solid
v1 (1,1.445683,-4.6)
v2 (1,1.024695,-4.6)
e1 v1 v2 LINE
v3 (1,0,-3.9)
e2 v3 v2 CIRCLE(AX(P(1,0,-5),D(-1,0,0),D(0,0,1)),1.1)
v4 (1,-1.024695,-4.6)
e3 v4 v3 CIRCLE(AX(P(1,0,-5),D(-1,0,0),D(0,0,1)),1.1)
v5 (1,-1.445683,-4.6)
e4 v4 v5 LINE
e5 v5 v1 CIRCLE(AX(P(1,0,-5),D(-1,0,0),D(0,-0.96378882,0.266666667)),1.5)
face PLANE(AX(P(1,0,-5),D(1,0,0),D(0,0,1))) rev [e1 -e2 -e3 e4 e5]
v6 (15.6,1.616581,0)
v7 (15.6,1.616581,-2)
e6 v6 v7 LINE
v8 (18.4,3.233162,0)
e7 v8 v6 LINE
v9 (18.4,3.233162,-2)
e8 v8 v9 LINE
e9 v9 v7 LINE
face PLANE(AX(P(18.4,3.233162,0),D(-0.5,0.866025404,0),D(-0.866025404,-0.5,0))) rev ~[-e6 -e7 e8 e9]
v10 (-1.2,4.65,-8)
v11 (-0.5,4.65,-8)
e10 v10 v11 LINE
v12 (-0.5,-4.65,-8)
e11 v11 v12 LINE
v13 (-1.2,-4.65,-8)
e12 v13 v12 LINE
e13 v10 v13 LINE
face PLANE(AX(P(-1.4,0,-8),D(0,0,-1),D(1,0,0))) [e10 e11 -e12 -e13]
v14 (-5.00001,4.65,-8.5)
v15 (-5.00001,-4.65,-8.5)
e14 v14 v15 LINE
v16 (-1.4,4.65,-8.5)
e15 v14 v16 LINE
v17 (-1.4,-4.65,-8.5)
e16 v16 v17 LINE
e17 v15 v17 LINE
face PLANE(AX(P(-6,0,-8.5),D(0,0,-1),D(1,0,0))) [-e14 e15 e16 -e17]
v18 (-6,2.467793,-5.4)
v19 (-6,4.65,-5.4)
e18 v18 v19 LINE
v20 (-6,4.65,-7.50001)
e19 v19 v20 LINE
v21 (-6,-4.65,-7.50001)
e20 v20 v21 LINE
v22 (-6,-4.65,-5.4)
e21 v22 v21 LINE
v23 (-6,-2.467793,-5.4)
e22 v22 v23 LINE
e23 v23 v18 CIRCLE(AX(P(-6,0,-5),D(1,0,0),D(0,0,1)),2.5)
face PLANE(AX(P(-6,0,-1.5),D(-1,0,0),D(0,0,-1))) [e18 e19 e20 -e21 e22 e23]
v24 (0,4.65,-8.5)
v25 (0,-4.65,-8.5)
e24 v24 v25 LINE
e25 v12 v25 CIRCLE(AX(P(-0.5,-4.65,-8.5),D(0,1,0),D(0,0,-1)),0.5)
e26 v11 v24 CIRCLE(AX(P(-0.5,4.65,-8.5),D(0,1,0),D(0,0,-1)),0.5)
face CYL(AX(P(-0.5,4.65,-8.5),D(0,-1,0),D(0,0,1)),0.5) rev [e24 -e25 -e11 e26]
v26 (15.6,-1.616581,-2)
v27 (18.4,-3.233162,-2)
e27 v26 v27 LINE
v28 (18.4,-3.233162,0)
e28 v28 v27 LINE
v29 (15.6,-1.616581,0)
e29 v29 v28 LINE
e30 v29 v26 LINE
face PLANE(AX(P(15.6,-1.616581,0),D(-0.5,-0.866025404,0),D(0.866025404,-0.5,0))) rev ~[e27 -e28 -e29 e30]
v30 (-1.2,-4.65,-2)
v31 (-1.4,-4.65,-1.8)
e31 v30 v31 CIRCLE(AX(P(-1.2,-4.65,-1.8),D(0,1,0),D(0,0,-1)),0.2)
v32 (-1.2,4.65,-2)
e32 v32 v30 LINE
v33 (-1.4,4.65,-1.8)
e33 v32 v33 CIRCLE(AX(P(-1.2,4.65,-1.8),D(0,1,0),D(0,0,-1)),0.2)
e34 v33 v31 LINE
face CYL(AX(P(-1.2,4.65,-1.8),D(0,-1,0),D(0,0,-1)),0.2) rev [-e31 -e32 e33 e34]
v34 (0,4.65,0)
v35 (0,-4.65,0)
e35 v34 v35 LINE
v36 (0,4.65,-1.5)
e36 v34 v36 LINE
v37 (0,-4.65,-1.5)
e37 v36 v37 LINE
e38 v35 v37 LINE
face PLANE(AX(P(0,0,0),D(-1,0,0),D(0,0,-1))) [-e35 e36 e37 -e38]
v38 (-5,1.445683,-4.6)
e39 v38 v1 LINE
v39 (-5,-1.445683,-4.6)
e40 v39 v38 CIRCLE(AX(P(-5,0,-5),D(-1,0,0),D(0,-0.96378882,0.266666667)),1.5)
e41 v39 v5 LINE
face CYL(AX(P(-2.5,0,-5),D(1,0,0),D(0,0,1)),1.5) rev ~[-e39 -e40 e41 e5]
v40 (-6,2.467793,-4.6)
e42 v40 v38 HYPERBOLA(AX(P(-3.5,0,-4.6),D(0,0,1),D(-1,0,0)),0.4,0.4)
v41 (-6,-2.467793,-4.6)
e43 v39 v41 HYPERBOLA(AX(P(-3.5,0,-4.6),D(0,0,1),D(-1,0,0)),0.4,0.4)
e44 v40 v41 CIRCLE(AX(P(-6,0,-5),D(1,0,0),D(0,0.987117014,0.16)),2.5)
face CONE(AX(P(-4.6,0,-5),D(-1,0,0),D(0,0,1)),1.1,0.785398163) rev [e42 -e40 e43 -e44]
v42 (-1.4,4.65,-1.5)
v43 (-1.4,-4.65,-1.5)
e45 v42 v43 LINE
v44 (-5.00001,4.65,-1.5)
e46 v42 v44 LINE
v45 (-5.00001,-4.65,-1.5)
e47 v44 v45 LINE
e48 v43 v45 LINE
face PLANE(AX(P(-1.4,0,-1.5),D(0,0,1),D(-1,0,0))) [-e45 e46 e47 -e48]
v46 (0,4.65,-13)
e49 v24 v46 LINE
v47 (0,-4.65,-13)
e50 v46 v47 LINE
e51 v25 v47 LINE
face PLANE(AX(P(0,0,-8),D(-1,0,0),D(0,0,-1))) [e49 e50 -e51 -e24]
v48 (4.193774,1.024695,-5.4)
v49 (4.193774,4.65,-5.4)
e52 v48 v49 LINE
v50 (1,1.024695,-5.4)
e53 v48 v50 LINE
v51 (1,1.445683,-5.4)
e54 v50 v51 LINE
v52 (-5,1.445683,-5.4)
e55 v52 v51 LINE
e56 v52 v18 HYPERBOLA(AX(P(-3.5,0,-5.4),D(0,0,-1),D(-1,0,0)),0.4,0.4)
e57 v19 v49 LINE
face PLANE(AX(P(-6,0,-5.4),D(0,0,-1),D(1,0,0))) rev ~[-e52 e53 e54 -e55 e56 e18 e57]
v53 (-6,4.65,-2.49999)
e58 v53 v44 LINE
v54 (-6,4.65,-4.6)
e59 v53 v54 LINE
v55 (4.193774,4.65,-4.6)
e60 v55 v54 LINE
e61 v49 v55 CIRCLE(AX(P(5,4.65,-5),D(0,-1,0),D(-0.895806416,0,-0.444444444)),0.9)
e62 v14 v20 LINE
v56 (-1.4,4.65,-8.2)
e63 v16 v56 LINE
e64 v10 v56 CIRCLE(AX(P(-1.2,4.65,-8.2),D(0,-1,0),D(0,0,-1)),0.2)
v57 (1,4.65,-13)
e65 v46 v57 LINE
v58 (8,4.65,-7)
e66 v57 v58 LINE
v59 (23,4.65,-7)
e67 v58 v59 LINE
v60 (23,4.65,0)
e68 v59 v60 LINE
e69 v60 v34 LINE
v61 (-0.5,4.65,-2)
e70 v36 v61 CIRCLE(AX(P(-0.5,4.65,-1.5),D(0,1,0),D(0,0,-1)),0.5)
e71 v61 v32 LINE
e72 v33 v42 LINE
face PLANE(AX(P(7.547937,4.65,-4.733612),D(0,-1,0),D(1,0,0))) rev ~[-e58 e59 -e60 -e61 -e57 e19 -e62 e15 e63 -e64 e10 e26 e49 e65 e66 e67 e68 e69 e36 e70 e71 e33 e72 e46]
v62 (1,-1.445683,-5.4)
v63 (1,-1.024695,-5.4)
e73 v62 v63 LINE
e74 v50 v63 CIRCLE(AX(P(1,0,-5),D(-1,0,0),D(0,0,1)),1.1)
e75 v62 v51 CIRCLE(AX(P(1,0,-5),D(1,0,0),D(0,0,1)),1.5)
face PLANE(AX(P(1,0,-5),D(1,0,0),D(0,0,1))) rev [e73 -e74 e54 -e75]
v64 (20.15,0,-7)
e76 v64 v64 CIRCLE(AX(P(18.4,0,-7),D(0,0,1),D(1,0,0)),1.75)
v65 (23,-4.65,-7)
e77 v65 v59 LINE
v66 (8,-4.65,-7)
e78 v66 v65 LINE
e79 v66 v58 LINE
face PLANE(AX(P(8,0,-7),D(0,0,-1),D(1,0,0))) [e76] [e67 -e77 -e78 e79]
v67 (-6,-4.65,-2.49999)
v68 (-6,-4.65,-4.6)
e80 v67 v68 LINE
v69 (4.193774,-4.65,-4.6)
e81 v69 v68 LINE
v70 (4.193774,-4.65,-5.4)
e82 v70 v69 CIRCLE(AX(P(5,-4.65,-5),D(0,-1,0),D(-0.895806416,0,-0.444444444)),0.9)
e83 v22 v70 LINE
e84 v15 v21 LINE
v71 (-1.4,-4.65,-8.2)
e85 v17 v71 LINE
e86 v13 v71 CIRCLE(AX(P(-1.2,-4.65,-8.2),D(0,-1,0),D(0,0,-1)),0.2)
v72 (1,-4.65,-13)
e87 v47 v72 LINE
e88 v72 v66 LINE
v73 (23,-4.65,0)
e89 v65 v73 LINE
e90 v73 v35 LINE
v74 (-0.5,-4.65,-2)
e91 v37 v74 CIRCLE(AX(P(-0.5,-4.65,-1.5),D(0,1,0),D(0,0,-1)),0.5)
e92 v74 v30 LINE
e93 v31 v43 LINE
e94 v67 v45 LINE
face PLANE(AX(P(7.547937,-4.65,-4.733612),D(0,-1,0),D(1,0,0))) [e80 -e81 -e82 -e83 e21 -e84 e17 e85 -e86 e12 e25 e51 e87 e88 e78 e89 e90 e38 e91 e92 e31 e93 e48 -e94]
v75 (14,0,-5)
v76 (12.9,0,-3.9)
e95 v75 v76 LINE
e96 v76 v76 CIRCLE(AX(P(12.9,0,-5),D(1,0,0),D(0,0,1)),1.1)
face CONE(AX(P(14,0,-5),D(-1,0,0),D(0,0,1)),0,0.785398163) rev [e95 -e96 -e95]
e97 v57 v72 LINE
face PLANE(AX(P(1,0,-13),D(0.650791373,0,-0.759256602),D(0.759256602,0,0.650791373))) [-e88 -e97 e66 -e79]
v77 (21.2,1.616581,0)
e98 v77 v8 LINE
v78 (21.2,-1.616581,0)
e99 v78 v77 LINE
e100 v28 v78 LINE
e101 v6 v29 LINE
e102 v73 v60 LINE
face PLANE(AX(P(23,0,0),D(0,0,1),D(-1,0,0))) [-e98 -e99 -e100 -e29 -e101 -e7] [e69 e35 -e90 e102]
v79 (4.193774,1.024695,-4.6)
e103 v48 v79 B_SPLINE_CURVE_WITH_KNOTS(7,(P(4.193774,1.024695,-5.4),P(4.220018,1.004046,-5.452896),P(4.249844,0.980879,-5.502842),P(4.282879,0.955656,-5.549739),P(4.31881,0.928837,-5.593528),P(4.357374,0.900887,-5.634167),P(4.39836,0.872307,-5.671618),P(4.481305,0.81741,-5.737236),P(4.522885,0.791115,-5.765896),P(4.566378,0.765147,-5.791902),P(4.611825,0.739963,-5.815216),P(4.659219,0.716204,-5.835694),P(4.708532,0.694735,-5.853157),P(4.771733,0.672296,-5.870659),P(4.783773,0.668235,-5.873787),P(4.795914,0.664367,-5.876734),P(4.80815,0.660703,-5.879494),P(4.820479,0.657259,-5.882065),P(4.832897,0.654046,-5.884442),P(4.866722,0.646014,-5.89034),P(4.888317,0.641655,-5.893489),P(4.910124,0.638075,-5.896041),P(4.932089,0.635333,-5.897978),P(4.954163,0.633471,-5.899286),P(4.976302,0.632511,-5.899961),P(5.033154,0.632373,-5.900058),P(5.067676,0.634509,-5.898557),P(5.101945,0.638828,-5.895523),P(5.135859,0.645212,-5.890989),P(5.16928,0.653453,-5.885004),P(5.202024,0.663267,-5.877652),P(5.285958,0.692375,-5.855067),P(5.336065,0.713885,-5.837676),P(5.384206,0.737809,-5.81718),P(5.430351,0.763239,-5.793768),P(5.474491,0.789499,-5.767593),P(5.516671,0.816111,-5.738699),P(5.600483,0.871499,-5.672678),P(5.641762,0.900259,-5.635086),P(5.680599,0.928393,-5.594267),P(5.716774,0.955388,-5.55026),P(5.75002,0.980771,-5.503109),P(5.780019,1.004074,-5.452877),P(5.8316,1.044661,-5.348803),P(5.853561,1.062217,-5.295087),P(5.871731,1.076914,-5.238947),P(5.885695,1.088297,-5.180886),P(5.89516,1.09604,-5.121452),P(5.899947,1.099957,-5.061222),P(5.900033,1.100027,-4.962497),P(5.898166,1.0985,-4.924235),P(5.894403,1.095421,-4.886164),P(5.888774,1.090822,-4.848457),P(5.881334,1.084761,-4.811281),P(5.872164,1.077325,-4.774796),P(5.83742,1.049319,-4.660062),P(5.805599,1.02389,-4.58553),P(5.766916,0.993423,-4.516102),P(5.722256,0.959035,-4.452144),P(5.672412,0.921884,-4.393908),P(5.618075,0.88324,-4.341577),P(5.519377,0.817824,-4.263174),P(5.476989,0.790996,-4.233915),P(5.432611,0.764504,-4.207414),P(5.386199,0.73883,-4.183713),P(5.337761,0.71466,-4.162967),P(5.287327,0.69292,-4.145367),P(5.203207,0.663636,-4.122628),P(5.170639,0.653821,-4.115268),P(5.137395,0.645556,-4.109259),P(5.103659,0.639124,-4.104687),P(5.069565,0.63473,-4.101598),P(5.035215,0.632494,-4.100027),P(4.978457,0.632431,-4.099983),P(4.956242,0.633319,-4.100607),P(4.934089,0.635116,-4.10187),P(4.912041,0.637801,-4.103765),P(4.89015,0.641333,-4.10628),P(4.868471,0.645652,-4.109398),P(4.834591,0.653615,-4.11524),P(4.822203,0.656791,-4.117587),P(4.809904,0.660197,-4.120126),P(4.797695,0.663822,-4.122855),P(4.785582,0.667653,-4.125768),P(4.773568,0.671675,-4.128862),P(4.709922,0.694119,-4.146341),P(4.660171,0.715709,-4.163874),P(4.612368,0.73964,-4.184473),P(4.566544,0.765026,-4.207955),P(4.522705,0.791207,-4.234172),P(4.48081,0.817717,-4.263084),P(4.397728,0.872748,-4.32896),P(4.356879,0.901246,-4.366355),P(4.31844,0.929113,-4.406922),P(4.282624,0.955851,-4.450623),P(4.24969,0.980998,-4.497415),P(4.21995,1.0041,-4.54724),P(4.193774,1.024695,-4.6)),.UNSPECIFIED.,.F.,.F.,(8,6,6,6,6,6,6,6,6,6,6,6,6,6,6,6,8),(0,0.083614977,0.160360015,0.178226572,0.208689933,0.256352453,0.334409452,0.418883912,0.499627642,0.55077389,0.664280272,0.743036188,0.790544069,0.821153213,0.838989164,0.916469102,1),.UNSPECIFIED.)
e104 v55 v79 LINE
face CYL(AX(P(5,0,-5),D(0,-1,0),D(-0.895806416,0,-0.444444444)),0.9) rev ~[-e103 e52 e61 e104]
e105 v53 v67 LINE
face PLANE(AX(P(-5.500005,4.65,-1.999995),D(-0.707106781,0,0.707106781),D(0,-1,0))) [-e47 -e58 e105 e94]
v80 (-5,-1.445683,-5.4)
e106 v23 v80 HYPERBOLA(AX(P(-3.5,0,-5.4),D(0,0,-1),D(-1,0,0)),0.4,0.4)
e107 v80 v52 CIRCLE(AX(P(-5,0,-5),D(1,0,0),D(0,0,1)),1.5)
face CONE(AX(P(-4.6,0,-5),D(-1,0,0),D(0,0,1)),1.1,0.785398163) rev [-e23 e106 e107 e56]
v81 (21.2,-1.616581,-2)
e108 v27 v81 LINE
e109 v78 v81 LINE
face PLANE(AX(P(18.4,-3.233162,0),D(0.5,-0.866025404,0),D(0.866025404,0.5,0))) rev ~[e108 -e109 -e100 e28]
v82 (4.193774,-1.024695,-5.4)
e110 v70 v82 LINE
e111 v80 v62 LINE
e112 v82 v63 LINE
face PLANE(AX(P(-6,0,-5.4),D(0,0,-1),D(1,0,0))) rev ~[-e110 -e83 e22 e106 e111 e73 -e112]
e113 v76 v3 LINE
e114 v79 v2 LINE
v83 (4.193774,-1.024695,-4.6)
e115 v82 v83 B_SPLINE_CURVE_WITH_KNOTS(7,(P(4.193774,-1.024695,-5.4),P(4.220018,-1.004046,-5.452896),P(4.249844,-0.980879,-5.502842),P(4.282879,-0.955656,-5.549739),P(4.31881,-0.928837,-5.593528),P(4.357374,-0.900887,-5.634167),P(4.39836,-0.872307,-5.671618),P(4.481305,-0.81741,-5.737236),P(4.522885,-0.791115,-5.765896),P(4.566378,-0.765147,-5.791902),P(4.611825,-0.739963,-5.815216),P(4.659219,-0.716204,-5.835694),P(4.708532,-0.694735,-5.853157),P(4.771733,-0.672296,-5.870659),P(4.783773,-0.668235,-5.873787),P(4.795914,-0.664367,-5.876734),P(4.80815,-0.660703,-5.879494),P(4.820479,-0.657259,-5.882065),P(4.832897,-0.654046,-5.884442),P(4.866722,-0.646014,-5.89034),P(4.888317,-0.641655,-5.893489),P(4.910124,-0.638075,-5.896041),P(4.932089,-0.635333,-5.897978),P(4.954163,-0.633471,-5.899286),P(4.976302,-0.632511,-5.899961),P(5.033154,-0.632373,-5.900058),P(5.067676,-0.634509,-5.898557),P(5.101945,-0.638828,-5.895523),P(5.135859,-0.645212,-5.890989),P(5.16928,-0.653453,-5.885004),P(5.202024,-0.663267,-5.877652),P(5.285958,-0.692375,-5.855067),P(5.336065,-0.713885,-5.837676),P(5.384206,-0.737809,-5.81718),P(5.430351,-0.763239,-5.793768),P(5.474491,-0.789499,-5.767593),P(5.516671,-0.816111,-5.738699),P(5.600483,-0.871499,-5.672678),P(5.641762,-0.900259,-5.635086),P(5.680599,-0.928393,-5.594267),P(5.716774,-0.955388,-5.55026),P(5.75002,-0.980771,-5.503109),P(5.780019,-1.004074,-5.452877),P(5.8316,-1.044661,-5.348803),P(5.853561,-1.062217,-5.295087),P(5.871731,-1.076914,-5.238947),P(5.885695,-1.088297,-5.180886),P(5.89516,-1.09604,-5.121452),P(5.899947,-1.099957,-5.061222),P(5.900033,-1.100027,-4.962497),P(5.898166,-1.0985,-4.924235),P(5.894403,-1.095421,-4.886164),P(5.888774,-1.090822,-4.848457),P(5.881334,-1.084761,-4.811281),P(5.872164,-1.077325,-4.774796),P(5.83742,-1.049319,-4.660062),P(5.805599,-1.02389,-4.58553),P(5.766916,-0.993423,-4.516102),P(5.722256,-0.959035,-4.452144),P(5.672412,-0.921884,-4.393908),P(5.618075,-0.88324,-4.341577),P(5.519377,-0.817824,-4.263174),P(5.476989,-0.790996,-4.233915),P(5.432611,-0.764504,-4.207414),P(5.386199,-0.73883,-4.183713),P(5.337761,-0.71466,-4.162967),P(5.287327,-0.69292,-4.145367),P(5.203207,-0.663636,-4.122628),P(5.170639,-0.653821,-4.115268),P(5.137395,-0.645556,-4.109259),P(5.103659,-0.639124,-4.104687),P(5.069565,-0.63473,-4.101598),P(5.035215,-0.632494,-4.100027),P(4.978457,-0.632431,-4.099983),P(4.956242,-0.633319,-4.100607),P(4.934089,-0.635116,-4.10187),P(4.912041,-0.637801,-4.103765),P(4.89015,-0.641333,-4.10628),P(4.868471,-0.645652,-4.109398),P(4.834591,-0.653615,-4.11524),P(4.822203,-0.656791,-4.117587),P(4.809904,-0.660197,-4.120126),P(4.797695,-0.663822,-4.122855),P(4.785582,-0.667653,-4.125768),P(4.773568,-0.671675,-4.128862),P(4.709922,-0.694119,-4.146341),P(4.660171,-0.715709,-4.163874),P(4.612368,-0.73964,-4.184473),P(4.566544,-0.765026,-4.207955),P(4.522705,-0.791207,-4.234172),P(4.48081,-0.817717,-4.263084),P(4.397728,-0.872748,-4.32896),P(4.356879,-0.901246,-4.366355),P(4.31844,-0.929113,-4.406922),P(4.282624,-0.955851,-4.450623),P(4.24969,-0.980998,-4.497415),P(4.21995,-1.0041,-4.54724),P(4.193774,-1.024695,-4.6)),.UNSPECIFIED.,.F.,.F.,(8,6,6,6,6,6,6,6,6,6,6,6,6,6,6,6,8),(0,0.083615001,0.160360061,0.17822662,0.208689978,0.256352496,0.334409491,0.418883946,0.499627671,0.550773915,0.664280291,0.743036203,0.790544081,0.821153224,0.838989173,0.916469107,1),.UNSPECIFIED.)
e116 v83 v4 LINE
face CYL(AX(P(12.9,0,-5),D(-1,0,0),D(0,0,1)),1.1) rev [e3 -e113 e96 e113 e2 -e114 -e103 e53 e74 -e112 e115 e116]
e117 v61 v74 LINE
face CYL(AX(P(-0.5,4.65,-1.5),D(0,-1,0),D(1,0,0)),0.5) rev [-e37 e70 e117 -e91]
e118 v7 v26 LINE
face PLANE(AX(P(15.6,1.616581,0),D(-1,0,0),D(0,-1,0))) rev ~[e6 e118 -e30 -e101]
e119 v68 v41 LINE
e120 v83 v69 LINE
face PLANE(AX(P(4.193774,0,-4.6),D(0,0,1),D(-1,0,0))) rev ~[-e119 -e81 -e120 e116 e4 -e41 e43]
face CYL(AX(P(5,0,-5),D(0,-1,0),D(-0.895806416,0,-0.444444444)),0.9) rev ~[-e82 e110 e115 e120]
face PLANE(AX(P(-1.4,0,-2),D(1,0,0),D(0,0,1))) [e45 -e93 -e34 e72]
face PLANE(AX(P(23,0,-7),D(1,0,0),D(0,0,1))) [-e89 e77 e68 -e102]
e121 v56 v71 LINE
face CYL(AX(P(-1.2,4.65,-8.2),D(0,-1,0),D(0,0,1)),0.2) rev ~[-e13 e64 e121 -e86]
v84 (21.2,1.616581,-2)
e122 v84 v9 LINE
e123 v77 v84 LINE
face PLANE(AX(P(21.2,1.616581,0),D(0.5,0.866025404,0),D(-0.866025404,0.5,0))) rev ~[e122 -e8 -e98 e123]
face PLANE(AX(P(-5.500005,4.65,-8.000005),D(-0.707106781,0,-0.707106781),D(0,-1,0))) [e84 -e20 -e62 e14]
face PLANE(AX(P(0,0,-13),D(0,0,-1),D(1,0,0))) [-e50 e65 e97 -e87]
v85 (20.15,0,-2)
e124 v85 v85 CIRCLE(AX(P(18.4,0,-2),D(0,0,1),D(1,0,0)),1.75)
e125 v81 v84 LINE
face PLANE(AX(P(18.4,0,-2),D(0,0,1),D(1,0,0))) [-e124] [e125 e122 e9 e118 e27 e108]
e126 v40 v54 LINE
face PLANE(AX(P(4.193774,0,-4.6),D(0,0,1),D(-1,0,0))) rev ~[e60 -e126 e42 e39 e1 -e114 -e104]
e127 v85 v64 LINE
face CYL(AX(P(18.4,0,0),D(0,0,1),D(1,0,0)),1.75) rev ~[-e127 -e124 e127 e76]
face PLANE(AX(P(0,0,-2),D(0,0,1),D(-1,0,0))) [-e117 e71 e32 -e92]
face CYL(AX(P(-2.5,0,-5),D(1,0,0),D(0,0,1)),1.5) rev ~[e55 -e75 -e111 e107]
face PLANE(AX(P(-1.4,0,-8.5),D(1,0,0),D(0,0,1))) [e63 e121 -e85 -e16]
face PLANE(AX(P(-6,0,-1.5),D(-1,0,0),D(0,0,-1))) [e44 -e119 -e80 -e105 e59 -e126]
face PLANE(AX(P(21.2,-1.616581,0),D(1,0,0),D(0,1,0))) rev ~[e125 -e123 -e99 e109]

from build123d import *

# Parameters (mm, degrees)
F1_DEPTH = 4.65
F2_R     = 1.75
F3_DEPTH = 13.001
F4_DEPTH = 2
F8_DEPTH = 12.5
F9_SIZE  = 0.99999
F10_R    = 0.5
F11_R    = 0.2
F12_W    = 7
F12_H    = 1.5


# Not quite as in the source:
# - a fillet or chamfer is up to 0.001 mm smaller than in the source, because OpenCascade refuses the exact size


with BuildPart() as f1:
    # F0 (on Front) → F1 (new body, symmetric)
    with BuildSketch(Plane.XZ):
        Polygon((23, 0), (0, 0), (0, -1.5), (0, -2), (-1.4, -2), (-1.4, -1.5), (-6, -1.5), (-6, -8.5), (-1.4, -8.5), (-1.4, -8), (0, -8), (0, -8.5), (0, -13), (1, -13), (8, -7), (23, -7), align=None)
    extrude(amount=F1_DEPTH, both=True)

    # F2 (on face) → F3 (cut, through all)
    with BuildSketch(Plane.XY):
        with Locations((18.4, 0)):
            Circle(F2_R)
    extrude(amount=-F3_DEPTH, mode=Mode.SUBTRACT)

    # F2 (on face) → F4 (cut)
    with BuildSketch(Plane.XY):
        Polygon((18.4, 3.2331615075), (15.6, 1.6165807537), (15.6, -1.6165807537), (18.4, -3.2331615075), (21.2, -1.6165807537), (21.2, 1.6165807537), align=None)
        with Locations((18.4, 0)):
            Circle(F2_R, mode=Mode.SUBTRACT)
    extrude(amount=-F4_DEPTH, mode=Mode.SUBTRACT)

    # F5 (on Front) → F6 (revolve, cut)
    with BuildSketch(Plane.XZ):
        Polygon((-6, -2.5), (-6, -5), (14, -5), (12.9, -3.9), (-4.6, -3.9), align=None)
    revolve(axis=Axis((22.399994296, 0, -5), (1, 0, 0)), mode=Mode.SUBTRACT)

    # F7 (on Front) → F8 (cut, symmetric)
    with BuildSketch(Plane.XZ):
        with BuildLine():
            ThreePointArc((4.1937742252, -5.4), (5.2054224947, -5.8762428879), (5.9, -5))
            ThreePointArc((5.9, -5), (5.2054224947, -4.1237571121), (4.1937742252, -4.6))
            ThreePointArc((4.1937742252, -4.6), (4.1, -5), (4.1937742252, -5.4))
        make_face()
        with BuildLine():
            ThreePointArc((4.1937742252, -5.4), (4.1, -5), (4.1937742252, -4.6))
            Line((4.1937742252, -4.6), (-6, -4.6))
            Line((-6, -4.6), (-6, -5.4))
            Line((-6, -5.4), (4.1937742252, -5.4))
        make_face()
    extrude(amount=F8_DEPTH, both=True, mode=Mode.SUBTRACT)

    # F9 (size 1 in the source; OpenCascade refuses exactly that, so slightly less here)
    f9_edges = [f1.edges().sort_by_distance(p)[0] for p in [
        (-6, 0, -8.5),
        (-6, 0, -1.5),
    ]]
    chamfer(f9_edges, length=F9_SIZE)

    # F10
    f10_edges = [f1.edges().sort_by_distance(p)[0] for p in [
        (0, 0, -2),
        (0, 0, -8),
    ]]
    fillet(f10_edges, radius=F10_R)

    # F11
    f11_edges = [f1.edges().sort_by_distance(p)[0] for p in [
        (-1.4, 0, -2),
        (-1.4, 0, -8),
    ]]
    fillet(f11_edges, radius=F11_R)

    # F12 (on Front) → F13 (revolve, cut)
    with BuildSketch(Plane.XZ):
        with Locations((-2.5, -4.25)):
            Rectangle(F12_W, F12_H)
    revolve(axis=Axis((4, 0, -5), (1, 0, 0)), mode=Mode.SUBTRACT)


solid = f1.part
